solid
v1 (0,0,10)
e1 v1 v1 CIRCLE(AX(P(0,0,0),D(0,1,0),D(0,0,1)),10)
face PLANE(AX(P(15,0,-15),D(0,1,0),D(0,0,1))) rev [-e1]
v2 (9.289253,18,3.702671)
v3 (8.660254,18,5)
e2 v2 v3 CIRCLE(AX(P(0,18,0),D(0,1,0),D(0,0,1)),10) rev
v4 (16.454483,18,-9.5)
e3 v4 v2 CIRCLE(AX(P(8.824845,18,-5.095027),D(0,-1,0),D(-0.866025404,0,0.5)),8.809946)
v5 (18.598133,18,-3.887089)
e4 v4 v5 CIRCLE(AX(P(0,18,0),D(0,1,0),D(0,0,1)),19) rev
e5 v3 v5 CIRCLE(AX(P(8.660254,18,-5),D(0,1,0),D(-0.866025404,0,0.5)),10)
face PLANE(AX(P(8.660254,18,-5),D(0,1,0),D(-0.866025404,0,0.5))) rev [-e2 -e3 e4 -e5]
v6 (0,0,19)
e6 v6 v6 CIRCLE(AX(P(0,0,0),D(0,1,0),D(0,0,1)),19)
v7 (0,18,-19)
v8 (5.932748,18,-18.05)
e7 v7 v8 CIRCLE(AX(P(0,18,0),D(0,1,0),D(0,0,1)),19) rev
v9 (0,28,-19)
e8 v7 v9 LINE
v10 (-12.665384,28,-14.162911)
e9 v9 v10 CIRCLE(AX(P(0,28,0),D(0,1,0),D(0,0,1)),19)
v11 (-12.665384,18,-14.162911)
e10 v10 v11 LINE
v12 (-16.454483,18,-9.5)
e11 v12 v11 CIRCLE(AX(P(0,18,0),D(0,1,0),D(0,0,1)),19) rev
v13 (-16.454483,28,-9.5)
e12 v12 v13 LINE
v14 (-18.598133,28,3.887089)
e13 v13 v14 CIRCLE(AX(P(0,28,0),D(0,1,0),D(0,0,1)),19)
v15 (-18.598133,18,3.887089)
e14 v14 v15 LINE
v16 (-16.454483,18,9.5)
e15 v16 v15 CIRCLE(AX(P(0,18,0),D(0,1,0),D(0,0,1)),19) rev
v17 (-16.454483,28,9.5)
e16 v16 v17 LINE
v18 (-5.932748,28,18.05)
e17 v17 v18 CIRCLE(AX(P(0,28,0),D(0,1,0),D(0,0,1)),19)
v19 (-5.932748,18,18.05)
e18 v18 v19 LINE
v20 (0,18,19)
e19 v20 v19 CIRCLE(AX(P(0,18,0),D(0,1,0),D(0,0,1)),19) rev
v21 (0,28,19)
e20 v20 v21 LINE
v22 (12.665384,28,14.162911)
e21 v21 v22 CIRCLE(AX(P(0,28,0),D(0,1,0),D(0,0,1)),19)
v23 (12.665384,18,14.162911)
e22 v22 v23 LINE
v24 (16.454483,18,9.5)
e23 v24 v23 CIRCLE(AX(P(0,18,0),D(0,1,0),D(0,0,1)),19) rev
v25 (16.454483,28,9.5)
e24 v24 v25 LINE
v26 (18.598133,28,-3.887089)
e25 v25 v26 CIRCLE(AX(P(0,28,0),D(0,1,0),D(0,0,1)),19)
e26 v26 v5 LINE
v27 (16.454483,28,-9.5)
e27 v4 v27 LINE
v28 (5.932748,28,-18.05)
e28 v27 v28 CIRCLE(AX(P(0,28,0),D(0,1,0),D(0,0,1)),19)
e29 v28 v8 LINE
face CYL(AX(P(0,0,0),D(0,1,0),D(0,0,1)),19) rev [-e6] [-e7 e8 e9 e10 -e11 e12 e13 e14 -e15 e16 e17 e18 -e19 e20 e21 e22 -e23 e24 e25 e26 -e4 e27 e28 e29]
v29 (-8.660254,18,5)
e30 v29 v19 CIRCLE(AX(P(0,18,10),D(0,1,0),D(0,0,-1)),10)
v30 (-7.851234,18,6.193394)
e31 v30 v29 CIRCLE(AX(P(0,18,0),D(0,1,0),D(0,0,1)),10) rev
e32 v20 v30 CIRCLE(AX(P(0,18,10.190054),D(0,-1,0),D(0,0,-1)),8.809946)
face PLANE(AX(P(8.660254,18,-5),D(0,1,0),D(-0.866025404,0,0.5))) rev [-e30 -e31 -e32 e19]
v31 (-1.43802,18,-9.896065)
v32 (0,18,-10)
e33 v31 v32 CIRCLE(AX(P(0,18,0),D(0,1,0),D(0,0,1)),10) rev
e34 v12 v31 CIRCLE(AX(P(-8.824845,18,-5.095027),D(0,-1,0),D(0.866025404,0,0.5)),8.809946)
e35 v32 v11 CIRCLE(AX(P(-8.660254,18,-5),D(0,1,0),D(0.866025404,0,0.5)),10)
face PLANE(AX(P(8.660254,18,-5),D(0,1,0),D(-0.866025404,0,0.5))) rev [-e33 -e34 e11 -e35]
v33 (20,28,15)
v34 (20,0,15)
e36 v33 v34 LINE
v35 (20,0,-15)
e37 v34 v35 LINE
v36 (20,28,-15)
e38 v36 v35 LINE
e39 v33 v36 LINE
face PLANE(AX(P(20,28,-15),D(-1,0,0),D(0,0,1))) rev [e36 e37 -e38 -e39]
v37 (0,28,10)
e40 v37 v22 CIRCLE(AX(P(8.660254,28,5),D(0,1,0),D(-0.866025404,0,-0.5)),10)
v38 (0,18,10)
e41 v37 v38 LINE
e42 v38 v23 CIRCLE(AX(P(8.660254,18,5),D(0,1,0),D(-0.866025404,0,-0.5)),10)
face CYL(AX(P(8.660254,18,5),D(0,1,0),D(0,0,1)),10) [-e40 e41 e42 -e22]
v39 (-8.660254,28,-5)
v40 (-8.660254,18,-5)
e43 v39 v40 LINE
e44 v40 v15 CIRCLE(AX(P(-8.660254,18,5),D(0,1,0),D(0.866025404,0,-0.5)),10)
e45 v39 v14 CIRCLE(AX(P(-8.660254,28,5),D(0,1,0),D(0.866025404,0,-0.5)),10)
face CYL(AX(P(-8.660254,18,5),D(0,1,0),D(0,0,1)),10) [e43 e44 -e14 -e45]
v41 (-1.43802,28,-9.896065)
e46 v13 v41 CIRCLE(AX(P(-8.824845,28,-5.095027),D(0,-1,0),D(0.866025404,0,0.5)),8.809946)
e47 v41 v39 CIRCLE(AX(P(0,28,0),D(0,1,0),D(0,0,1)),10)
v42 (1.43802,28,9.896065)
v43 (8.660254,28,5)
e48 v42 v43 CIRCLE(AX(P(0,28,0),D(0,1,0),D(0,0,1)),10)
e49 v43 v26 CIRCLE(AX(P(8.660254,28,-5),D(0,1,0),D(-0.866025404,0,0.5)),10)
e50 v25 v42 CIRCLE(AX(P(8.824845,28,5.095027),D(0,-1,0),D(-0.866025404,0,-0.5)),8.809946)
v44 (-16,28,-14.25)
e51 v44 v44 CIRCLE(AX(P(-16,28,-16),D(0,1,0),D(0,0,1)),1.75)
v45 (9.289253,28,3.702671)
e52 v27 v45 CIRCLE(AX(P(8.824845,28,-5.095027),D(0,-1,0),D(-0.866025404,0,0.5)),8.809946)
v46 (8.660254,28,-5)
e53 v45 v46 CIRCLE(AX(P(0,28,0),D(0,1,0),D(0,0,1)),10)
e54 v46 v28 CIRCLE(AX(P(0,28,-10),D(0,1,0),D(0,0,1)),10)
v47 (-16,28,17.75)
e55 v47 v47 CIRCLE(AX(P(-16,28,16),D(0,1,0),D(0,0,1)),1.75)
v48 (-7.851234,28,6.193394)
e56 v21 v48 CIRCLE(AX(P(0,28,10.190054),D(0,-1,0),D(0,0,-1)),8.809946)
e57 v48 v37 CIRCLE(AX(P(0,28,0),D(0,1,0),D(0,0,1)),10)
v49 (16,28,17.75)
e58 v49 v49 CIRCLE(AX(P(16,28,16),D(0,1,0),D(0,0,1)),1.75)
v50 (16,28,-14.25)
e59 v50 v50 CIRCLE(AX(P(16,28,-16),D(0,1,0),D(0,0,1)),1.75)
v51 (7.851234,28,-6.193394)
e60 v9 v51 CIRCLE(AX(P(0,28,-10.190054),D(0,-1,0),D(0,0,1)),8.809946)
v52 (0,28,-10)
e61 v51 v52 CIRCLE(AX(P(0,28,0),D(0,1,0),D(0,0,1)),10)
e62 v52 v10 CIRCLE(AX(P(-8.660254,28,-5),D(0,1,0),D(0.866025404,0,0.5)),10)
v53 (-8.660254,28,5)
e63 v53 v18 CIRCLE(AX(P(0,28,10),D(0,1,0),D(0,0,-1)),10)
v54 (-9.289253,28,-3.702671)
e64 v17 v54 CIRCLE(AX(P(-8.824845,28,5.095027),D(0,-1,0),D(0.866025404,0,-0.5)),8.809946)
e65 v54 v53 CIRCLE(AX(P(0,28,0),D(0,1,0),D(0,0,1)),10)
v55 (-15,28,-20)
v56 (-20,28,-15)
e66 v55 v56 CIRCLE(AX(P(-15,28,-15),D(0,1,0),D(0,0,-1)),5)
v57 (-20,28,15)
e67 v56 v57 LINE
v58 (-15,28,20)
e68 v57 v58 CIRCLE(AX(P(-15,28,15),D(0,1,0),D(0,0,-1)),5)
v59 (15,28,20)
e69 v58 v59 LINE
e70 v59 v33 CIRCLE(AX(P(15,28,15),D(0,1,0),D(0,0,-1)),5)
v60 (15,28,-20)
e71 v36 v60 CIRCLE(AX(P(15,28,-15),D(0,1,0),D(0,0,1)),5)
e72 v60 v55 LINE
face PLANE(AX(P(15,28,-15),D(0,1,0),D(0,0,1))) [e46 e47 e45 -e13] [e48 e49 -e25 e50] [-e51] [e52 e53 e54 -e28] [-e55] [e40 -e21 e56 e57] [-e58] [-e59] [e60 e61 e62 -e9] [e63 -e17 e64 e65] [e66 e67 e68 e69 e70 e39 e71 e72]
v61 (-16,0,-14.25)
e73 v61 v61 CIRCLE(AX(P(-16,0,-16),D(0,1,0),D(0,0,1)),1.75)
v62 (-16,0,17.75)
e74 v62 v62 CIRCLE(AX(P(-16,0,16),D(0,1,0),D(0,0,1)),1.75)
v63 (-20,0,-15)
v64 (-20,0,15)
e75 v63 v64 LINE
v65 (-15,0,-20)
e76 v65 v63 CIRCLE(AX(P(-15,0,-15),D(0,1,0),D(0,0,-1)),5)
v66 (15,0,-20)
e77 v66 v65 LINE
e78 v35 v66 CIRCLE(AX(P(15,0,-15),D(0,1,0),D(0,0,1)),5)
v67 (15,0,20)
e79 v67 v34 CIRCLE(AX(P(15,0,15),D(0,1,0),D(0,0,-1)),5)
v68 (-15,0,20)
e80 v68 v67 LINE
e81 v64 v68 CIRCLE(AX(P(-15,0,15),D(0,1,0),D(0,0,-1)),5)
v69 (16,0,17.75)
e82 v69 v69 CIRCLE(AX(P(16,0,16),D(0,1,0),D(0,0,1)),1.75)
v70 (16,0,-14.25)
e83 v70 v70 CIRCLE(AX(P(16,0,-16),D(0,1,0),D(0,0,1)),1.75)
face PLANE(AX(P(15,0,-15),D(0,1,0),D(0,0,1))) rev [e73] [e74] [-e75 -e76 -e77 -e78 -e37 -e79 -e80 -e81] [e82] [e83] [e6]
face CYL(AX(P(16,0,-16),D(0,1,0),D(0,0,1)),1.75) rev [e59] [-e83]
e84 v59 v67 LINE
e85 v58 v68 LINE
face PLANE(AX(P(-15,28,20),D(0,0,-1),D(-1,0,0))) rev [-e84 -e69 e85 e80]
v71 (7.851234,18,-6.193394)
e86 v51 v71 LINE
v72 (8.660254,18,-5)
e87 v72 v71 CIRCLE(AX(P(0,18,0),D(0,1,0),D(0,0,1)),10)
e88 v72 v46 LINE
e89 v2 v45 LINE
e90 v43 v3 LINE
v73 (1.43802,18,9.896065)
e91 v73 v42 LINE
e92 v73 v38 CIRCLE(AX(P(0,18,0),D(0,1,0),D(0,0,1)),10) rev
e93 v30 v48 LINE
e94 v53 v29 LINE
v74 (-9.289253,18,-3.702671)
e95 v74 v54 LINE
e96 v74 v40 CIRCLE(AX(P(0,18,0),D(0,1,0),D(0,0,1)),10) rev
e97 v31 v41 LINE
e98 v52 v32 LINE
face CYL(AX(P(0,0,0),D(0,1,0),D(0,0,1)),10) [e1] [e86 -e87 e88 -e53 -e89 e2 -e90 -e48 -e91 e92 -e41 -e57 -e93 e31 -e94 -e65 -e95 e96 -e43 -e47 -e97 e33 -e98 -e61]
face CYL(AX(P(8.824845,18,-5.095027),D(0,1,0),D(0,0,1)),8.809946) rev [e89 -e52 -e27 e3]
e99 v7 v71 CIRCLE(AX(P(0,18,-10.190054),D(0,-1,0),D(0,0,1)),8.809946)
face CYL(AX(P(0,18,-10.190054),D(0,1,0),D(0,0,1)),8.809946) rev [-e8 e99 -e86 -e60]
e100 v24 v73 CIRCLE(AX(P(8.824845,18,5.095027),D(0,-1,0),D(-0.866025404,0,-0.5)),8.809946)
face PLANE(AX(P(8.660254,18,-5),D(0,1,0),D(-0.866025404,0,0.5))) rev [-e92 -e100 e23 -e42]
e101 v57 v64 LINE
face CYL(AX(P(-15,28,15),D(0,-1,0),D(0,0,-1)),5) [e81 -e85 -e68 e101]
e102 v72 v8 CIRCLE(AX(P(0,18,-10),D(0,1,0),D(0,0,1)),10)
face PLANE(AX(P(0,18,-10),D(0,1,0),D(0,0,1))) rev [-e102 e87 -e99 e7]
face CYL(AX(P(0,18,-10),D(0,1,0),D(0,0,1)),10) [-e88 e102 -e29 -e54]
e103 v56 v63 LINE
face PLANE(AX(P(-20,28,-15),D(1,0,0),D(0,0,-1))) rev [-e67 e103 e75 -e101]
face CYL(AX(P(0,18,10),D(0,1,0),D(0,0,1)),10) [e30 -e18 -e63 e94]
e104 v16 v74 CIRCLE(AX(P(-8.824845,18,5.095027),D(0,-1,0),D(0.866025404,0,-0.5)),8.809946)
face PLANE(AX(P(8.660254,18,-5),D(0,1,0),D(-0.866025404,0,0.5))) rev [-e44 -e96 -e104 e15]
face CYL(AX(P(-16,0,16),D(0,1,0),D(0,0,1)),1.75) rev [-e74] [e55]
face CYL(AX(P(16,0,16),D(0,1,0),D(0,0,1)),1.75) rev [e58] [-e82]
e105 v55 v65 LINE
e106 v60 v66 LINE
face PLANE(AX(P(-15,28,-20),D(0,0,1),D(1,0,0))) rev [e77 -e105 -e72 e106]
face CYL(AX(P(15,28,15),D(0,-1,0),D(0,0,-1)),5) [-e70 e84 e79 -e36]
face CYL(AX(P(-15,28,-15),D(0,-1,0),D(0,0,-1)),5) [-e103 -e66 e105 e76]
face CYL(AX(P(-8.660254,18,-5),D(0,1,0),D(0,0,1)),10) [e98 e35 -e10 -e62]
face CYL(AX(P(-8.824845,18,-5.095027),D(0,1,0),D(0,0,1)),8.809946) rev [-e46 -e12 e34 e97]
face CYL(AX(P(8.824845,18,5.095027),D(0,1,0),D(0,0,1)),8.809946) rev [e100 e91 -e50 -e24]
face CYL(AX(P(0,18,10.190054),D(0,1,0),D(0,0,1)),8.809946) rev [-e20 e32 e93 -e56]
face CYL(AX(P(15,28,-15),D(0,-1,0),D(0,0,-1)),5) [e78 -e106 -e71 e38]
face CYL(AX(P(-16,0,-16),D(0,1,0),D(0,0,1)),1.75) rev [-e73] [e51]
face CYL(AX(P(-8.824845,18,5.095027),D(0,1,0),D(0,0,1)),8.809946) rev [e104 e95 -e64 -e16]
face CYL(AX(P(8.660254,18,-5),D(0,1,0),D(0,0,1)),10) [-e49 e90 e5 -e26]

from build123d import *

# Parameters (mm, degrees)
EXTRUDE_1_DEPTH          = 28
SKETCH_2_R               = 1.75
CUT_EXTRUDE_1_DEPTH      = 40.799497484
SKETCH_3_R               = 19
SKETCH_3_R_2             = 10
CUT_EXTRUDE_2_DEPTH      = 40.799497484
EXTRUDE_2_DEPTH          = 10
PATTERN_START            = 18
PATTERN_CIRCULAR_1_DEPTH = 10


# Read off the part's stored shape, not the designer's step: 阵列(圆周)1
with BuildPart() as part:
    # 草图1 → 凸台-拉伸1 (new body)
    with BuildSketch(Plane(origin=(0, 0, 0), x_dir=(1, 0, 0), z_dir=(0, 1, 0))):
        with BuildLine():
            Line((-15, 20), (15, 20))
            ThreePointArc((15, 20), (18.535533906, 18.535533906), (20, 15))
            Line((20, 15), (20, -15))
            ThreePointArc((20, -15), (18.535533906, -18.535533906), (15, -20))
            Line((15, -20), (-15, -20))
            ThreePointArc((-15, -20), (-18.535533906, -18.535533906), (-20, -15))
            Line((-20, -15), (-20, 15))
            ThreePointArc((-20, 15), (-18.535533906, 18.535533906), (-15, 20))
        make_face()
    extrude(amount=EXTRUDE_1_DEPTH)

    # 草图2 → 切除-拉伸1 (cut, through all)
    with BuildSketch(Plane(origin=(0, 28, 0), x_dir=(1, 0, 0), z_dir=(0, 1, 0))):
        with Locations(Location((-16, 16, 0), (0, 0, 270))):
            Circle(SKETCH_2_R)
        with Locations(Location((16, 16, 0), (0, 0, 270))):
            Circle(SKETCH_2_R)
        with Locations(Location((16, -16, 0), (0, 0, 270))):
            Circle(SKETCH_2_R)
        with Locations(Location((-16, -16, 0), (0, 0, 270))):
            Circle(SKETCH_2_R)
    extrude(amount=-CUT_EXTRUDE_1_DEPTH, mode=Mode.SUBTRACT)

    # 草图3 → 切除-拉伸2 (cut, through all)
    with BuildSketch(Plane(origin=(0, 28, 0), x_dir=(1, 0, 0), z_dir=(0, 1, 0))):
        with Locations(Location((0, 0, 0), (0, 0, 270))):
            Circle(SKETCH_3_R)
        with Locations(Location((0, 0, 0), (0, 0, 270))):
            Circle(SKETCH_3_R_2, mode=Mode.SUBTRACT)
    extrude(amount=-CUT_EXTRUDE_2_DEPTH, mode=Mode.SUBTRACT)


with BuildPart() as cut_extrude_2_piece_1:
    # of the separate pieces the step leaves, piece 1, a body of its own (cut_extrude_2_pieces)
    add(part.part.solids().sort_by_distance((-15, 0, -20))[0])



with BuildPart() as cut_extrude_2_piece_2:
    # of the separate pieces the step leaves, piece 2, a body of its own (cut_extrude_2_pieces)
    add(part.part.solids().sort_by_distance((0, 0, 10))[0])


with BuildPart() as cut_extrude_2_piece_1_1:
    add(cut_extrude_2_piece_1.part)

    add(cut_extrude_2_piece_2.part)  # 凸台-拉伸2 merges 切除-拉伸2 piece 2
    # 草图4 → 凸台-拉伸2 (add)
    with BuildSketch(Plane(origin=(0, 28, 0), x_dir=(1, 0, 0), z_dir=(0, 1, 0))):
        with BuildLine():
            Line((0, 20), (0, 19))
            ThreePointArc((0, 19), (8.809946394, 10.190053606), (0, 1.380107213))
            Line((0, 1.380107213), (0, 0))
            ThreePointArc((0, 0), (10, 10), (0, 20))
        make_face()
    extrude(amount=-EXTRUDE_2_DEPTH)

    # 阵列(圆周)1 outline → 阵列(圆周)1 (add)
    with BuildSketch(Plane(origin=(0, 0, 0), x_dir=(1, 0, 0), z_dir=(0, 1, 0)).offset(PATTERN_START)):
        with BuildLine():
            ThreePointArc((-1.43801989, 9.896064814), (-0.720885519, 9.973982358), (0, 10))
            ThreePointArc((0, 10), (-5.537755039, 14.5), (-12.665384489, 14.162910568))
            ThreePointArc((-12.665384489, 14.162910568), (-14.745417919, 11.982180536), (-16.454482672, 9.5))
            ThreePointArc((-16.454482672, 9.5), (-9.057130134, 13.90191043), (-1.43801989, 9.896064814))
        make_face()
        with BuildLine():
            ThreePointArc((18.598132588, 3.887089432), (17.749581696, 6.778816239), (16.454482672, 9.5))
            ThreePointArc((16.454482672, 9.5), (16.56797266, 0.892749566), (9.289253471, -3.702670651))
            ThreePointArc((9.289253471, -3.702670651), (8.998164858, -4.362686006), (8.660254038, -5))
            ThreePointArc((8.660254038, -5), (15.326245874, -2.454163457), (18.598132588, 3.887089432))
        make_face()
        with BuildLine():
            ThreePointArc((-9.289253471, 3.702670651), (-8.998164858, 4.362686006), (-8.660254038, 5))
            ThreePointArc((-8.660254038, 5), (-15.326245874, 2.454163457), (-18.598132588, -3.887089432))
            ThreePointArc((-18.598132588, -3.887089432), (-17.749581696, -6.778816239), (-16.454482672, -9.5))
            ThreePointArc((-16.454482672, -9.5), (-16.56797266, -0.892749566), (-9.289253471, 3.702670651))
        make_face()
        with BuildLine():
            ThreePointArc((16.454482672, -9.5), (9.057130134, -13.90191043), (1.43801989, -9.896064814))
            ThreePointArc((1.43801989, -9.896064814), (0.720885519, -9.973982358), (0, -10))
            ThreePointArc((0, -10), (5.537755039, -14.5), (12.665384489, -14.162910568))
            ThreePointArc((12.665384489, -14.162910568), (14.745417919, -11.982180536), (16.454482672, -9.5))
        make_face()
        with BuildLine():
            ThreePointArc((-7.851233581, -6.193394163), (-8.277279339, -5.611296352), (-8.660254038, -5))
            ThreePointArc((-8.660254038, -5), (-9.788490836, -12.045836544), (-5.932748098, -18.05))
            ThreePointArc((-5.932748098, -18.05), (-3.004163777, -18.760996775), (0, -19))
            ThreePointArc((0, -19), (-7.510842526, -14.794659996), (-7.851233581, -6.193394163))
        make_face()
    extrude(amount=PATTERN_CIRCULAR_1_DEPTH)


solid = cut_extrude_2_piece_1_1.part
